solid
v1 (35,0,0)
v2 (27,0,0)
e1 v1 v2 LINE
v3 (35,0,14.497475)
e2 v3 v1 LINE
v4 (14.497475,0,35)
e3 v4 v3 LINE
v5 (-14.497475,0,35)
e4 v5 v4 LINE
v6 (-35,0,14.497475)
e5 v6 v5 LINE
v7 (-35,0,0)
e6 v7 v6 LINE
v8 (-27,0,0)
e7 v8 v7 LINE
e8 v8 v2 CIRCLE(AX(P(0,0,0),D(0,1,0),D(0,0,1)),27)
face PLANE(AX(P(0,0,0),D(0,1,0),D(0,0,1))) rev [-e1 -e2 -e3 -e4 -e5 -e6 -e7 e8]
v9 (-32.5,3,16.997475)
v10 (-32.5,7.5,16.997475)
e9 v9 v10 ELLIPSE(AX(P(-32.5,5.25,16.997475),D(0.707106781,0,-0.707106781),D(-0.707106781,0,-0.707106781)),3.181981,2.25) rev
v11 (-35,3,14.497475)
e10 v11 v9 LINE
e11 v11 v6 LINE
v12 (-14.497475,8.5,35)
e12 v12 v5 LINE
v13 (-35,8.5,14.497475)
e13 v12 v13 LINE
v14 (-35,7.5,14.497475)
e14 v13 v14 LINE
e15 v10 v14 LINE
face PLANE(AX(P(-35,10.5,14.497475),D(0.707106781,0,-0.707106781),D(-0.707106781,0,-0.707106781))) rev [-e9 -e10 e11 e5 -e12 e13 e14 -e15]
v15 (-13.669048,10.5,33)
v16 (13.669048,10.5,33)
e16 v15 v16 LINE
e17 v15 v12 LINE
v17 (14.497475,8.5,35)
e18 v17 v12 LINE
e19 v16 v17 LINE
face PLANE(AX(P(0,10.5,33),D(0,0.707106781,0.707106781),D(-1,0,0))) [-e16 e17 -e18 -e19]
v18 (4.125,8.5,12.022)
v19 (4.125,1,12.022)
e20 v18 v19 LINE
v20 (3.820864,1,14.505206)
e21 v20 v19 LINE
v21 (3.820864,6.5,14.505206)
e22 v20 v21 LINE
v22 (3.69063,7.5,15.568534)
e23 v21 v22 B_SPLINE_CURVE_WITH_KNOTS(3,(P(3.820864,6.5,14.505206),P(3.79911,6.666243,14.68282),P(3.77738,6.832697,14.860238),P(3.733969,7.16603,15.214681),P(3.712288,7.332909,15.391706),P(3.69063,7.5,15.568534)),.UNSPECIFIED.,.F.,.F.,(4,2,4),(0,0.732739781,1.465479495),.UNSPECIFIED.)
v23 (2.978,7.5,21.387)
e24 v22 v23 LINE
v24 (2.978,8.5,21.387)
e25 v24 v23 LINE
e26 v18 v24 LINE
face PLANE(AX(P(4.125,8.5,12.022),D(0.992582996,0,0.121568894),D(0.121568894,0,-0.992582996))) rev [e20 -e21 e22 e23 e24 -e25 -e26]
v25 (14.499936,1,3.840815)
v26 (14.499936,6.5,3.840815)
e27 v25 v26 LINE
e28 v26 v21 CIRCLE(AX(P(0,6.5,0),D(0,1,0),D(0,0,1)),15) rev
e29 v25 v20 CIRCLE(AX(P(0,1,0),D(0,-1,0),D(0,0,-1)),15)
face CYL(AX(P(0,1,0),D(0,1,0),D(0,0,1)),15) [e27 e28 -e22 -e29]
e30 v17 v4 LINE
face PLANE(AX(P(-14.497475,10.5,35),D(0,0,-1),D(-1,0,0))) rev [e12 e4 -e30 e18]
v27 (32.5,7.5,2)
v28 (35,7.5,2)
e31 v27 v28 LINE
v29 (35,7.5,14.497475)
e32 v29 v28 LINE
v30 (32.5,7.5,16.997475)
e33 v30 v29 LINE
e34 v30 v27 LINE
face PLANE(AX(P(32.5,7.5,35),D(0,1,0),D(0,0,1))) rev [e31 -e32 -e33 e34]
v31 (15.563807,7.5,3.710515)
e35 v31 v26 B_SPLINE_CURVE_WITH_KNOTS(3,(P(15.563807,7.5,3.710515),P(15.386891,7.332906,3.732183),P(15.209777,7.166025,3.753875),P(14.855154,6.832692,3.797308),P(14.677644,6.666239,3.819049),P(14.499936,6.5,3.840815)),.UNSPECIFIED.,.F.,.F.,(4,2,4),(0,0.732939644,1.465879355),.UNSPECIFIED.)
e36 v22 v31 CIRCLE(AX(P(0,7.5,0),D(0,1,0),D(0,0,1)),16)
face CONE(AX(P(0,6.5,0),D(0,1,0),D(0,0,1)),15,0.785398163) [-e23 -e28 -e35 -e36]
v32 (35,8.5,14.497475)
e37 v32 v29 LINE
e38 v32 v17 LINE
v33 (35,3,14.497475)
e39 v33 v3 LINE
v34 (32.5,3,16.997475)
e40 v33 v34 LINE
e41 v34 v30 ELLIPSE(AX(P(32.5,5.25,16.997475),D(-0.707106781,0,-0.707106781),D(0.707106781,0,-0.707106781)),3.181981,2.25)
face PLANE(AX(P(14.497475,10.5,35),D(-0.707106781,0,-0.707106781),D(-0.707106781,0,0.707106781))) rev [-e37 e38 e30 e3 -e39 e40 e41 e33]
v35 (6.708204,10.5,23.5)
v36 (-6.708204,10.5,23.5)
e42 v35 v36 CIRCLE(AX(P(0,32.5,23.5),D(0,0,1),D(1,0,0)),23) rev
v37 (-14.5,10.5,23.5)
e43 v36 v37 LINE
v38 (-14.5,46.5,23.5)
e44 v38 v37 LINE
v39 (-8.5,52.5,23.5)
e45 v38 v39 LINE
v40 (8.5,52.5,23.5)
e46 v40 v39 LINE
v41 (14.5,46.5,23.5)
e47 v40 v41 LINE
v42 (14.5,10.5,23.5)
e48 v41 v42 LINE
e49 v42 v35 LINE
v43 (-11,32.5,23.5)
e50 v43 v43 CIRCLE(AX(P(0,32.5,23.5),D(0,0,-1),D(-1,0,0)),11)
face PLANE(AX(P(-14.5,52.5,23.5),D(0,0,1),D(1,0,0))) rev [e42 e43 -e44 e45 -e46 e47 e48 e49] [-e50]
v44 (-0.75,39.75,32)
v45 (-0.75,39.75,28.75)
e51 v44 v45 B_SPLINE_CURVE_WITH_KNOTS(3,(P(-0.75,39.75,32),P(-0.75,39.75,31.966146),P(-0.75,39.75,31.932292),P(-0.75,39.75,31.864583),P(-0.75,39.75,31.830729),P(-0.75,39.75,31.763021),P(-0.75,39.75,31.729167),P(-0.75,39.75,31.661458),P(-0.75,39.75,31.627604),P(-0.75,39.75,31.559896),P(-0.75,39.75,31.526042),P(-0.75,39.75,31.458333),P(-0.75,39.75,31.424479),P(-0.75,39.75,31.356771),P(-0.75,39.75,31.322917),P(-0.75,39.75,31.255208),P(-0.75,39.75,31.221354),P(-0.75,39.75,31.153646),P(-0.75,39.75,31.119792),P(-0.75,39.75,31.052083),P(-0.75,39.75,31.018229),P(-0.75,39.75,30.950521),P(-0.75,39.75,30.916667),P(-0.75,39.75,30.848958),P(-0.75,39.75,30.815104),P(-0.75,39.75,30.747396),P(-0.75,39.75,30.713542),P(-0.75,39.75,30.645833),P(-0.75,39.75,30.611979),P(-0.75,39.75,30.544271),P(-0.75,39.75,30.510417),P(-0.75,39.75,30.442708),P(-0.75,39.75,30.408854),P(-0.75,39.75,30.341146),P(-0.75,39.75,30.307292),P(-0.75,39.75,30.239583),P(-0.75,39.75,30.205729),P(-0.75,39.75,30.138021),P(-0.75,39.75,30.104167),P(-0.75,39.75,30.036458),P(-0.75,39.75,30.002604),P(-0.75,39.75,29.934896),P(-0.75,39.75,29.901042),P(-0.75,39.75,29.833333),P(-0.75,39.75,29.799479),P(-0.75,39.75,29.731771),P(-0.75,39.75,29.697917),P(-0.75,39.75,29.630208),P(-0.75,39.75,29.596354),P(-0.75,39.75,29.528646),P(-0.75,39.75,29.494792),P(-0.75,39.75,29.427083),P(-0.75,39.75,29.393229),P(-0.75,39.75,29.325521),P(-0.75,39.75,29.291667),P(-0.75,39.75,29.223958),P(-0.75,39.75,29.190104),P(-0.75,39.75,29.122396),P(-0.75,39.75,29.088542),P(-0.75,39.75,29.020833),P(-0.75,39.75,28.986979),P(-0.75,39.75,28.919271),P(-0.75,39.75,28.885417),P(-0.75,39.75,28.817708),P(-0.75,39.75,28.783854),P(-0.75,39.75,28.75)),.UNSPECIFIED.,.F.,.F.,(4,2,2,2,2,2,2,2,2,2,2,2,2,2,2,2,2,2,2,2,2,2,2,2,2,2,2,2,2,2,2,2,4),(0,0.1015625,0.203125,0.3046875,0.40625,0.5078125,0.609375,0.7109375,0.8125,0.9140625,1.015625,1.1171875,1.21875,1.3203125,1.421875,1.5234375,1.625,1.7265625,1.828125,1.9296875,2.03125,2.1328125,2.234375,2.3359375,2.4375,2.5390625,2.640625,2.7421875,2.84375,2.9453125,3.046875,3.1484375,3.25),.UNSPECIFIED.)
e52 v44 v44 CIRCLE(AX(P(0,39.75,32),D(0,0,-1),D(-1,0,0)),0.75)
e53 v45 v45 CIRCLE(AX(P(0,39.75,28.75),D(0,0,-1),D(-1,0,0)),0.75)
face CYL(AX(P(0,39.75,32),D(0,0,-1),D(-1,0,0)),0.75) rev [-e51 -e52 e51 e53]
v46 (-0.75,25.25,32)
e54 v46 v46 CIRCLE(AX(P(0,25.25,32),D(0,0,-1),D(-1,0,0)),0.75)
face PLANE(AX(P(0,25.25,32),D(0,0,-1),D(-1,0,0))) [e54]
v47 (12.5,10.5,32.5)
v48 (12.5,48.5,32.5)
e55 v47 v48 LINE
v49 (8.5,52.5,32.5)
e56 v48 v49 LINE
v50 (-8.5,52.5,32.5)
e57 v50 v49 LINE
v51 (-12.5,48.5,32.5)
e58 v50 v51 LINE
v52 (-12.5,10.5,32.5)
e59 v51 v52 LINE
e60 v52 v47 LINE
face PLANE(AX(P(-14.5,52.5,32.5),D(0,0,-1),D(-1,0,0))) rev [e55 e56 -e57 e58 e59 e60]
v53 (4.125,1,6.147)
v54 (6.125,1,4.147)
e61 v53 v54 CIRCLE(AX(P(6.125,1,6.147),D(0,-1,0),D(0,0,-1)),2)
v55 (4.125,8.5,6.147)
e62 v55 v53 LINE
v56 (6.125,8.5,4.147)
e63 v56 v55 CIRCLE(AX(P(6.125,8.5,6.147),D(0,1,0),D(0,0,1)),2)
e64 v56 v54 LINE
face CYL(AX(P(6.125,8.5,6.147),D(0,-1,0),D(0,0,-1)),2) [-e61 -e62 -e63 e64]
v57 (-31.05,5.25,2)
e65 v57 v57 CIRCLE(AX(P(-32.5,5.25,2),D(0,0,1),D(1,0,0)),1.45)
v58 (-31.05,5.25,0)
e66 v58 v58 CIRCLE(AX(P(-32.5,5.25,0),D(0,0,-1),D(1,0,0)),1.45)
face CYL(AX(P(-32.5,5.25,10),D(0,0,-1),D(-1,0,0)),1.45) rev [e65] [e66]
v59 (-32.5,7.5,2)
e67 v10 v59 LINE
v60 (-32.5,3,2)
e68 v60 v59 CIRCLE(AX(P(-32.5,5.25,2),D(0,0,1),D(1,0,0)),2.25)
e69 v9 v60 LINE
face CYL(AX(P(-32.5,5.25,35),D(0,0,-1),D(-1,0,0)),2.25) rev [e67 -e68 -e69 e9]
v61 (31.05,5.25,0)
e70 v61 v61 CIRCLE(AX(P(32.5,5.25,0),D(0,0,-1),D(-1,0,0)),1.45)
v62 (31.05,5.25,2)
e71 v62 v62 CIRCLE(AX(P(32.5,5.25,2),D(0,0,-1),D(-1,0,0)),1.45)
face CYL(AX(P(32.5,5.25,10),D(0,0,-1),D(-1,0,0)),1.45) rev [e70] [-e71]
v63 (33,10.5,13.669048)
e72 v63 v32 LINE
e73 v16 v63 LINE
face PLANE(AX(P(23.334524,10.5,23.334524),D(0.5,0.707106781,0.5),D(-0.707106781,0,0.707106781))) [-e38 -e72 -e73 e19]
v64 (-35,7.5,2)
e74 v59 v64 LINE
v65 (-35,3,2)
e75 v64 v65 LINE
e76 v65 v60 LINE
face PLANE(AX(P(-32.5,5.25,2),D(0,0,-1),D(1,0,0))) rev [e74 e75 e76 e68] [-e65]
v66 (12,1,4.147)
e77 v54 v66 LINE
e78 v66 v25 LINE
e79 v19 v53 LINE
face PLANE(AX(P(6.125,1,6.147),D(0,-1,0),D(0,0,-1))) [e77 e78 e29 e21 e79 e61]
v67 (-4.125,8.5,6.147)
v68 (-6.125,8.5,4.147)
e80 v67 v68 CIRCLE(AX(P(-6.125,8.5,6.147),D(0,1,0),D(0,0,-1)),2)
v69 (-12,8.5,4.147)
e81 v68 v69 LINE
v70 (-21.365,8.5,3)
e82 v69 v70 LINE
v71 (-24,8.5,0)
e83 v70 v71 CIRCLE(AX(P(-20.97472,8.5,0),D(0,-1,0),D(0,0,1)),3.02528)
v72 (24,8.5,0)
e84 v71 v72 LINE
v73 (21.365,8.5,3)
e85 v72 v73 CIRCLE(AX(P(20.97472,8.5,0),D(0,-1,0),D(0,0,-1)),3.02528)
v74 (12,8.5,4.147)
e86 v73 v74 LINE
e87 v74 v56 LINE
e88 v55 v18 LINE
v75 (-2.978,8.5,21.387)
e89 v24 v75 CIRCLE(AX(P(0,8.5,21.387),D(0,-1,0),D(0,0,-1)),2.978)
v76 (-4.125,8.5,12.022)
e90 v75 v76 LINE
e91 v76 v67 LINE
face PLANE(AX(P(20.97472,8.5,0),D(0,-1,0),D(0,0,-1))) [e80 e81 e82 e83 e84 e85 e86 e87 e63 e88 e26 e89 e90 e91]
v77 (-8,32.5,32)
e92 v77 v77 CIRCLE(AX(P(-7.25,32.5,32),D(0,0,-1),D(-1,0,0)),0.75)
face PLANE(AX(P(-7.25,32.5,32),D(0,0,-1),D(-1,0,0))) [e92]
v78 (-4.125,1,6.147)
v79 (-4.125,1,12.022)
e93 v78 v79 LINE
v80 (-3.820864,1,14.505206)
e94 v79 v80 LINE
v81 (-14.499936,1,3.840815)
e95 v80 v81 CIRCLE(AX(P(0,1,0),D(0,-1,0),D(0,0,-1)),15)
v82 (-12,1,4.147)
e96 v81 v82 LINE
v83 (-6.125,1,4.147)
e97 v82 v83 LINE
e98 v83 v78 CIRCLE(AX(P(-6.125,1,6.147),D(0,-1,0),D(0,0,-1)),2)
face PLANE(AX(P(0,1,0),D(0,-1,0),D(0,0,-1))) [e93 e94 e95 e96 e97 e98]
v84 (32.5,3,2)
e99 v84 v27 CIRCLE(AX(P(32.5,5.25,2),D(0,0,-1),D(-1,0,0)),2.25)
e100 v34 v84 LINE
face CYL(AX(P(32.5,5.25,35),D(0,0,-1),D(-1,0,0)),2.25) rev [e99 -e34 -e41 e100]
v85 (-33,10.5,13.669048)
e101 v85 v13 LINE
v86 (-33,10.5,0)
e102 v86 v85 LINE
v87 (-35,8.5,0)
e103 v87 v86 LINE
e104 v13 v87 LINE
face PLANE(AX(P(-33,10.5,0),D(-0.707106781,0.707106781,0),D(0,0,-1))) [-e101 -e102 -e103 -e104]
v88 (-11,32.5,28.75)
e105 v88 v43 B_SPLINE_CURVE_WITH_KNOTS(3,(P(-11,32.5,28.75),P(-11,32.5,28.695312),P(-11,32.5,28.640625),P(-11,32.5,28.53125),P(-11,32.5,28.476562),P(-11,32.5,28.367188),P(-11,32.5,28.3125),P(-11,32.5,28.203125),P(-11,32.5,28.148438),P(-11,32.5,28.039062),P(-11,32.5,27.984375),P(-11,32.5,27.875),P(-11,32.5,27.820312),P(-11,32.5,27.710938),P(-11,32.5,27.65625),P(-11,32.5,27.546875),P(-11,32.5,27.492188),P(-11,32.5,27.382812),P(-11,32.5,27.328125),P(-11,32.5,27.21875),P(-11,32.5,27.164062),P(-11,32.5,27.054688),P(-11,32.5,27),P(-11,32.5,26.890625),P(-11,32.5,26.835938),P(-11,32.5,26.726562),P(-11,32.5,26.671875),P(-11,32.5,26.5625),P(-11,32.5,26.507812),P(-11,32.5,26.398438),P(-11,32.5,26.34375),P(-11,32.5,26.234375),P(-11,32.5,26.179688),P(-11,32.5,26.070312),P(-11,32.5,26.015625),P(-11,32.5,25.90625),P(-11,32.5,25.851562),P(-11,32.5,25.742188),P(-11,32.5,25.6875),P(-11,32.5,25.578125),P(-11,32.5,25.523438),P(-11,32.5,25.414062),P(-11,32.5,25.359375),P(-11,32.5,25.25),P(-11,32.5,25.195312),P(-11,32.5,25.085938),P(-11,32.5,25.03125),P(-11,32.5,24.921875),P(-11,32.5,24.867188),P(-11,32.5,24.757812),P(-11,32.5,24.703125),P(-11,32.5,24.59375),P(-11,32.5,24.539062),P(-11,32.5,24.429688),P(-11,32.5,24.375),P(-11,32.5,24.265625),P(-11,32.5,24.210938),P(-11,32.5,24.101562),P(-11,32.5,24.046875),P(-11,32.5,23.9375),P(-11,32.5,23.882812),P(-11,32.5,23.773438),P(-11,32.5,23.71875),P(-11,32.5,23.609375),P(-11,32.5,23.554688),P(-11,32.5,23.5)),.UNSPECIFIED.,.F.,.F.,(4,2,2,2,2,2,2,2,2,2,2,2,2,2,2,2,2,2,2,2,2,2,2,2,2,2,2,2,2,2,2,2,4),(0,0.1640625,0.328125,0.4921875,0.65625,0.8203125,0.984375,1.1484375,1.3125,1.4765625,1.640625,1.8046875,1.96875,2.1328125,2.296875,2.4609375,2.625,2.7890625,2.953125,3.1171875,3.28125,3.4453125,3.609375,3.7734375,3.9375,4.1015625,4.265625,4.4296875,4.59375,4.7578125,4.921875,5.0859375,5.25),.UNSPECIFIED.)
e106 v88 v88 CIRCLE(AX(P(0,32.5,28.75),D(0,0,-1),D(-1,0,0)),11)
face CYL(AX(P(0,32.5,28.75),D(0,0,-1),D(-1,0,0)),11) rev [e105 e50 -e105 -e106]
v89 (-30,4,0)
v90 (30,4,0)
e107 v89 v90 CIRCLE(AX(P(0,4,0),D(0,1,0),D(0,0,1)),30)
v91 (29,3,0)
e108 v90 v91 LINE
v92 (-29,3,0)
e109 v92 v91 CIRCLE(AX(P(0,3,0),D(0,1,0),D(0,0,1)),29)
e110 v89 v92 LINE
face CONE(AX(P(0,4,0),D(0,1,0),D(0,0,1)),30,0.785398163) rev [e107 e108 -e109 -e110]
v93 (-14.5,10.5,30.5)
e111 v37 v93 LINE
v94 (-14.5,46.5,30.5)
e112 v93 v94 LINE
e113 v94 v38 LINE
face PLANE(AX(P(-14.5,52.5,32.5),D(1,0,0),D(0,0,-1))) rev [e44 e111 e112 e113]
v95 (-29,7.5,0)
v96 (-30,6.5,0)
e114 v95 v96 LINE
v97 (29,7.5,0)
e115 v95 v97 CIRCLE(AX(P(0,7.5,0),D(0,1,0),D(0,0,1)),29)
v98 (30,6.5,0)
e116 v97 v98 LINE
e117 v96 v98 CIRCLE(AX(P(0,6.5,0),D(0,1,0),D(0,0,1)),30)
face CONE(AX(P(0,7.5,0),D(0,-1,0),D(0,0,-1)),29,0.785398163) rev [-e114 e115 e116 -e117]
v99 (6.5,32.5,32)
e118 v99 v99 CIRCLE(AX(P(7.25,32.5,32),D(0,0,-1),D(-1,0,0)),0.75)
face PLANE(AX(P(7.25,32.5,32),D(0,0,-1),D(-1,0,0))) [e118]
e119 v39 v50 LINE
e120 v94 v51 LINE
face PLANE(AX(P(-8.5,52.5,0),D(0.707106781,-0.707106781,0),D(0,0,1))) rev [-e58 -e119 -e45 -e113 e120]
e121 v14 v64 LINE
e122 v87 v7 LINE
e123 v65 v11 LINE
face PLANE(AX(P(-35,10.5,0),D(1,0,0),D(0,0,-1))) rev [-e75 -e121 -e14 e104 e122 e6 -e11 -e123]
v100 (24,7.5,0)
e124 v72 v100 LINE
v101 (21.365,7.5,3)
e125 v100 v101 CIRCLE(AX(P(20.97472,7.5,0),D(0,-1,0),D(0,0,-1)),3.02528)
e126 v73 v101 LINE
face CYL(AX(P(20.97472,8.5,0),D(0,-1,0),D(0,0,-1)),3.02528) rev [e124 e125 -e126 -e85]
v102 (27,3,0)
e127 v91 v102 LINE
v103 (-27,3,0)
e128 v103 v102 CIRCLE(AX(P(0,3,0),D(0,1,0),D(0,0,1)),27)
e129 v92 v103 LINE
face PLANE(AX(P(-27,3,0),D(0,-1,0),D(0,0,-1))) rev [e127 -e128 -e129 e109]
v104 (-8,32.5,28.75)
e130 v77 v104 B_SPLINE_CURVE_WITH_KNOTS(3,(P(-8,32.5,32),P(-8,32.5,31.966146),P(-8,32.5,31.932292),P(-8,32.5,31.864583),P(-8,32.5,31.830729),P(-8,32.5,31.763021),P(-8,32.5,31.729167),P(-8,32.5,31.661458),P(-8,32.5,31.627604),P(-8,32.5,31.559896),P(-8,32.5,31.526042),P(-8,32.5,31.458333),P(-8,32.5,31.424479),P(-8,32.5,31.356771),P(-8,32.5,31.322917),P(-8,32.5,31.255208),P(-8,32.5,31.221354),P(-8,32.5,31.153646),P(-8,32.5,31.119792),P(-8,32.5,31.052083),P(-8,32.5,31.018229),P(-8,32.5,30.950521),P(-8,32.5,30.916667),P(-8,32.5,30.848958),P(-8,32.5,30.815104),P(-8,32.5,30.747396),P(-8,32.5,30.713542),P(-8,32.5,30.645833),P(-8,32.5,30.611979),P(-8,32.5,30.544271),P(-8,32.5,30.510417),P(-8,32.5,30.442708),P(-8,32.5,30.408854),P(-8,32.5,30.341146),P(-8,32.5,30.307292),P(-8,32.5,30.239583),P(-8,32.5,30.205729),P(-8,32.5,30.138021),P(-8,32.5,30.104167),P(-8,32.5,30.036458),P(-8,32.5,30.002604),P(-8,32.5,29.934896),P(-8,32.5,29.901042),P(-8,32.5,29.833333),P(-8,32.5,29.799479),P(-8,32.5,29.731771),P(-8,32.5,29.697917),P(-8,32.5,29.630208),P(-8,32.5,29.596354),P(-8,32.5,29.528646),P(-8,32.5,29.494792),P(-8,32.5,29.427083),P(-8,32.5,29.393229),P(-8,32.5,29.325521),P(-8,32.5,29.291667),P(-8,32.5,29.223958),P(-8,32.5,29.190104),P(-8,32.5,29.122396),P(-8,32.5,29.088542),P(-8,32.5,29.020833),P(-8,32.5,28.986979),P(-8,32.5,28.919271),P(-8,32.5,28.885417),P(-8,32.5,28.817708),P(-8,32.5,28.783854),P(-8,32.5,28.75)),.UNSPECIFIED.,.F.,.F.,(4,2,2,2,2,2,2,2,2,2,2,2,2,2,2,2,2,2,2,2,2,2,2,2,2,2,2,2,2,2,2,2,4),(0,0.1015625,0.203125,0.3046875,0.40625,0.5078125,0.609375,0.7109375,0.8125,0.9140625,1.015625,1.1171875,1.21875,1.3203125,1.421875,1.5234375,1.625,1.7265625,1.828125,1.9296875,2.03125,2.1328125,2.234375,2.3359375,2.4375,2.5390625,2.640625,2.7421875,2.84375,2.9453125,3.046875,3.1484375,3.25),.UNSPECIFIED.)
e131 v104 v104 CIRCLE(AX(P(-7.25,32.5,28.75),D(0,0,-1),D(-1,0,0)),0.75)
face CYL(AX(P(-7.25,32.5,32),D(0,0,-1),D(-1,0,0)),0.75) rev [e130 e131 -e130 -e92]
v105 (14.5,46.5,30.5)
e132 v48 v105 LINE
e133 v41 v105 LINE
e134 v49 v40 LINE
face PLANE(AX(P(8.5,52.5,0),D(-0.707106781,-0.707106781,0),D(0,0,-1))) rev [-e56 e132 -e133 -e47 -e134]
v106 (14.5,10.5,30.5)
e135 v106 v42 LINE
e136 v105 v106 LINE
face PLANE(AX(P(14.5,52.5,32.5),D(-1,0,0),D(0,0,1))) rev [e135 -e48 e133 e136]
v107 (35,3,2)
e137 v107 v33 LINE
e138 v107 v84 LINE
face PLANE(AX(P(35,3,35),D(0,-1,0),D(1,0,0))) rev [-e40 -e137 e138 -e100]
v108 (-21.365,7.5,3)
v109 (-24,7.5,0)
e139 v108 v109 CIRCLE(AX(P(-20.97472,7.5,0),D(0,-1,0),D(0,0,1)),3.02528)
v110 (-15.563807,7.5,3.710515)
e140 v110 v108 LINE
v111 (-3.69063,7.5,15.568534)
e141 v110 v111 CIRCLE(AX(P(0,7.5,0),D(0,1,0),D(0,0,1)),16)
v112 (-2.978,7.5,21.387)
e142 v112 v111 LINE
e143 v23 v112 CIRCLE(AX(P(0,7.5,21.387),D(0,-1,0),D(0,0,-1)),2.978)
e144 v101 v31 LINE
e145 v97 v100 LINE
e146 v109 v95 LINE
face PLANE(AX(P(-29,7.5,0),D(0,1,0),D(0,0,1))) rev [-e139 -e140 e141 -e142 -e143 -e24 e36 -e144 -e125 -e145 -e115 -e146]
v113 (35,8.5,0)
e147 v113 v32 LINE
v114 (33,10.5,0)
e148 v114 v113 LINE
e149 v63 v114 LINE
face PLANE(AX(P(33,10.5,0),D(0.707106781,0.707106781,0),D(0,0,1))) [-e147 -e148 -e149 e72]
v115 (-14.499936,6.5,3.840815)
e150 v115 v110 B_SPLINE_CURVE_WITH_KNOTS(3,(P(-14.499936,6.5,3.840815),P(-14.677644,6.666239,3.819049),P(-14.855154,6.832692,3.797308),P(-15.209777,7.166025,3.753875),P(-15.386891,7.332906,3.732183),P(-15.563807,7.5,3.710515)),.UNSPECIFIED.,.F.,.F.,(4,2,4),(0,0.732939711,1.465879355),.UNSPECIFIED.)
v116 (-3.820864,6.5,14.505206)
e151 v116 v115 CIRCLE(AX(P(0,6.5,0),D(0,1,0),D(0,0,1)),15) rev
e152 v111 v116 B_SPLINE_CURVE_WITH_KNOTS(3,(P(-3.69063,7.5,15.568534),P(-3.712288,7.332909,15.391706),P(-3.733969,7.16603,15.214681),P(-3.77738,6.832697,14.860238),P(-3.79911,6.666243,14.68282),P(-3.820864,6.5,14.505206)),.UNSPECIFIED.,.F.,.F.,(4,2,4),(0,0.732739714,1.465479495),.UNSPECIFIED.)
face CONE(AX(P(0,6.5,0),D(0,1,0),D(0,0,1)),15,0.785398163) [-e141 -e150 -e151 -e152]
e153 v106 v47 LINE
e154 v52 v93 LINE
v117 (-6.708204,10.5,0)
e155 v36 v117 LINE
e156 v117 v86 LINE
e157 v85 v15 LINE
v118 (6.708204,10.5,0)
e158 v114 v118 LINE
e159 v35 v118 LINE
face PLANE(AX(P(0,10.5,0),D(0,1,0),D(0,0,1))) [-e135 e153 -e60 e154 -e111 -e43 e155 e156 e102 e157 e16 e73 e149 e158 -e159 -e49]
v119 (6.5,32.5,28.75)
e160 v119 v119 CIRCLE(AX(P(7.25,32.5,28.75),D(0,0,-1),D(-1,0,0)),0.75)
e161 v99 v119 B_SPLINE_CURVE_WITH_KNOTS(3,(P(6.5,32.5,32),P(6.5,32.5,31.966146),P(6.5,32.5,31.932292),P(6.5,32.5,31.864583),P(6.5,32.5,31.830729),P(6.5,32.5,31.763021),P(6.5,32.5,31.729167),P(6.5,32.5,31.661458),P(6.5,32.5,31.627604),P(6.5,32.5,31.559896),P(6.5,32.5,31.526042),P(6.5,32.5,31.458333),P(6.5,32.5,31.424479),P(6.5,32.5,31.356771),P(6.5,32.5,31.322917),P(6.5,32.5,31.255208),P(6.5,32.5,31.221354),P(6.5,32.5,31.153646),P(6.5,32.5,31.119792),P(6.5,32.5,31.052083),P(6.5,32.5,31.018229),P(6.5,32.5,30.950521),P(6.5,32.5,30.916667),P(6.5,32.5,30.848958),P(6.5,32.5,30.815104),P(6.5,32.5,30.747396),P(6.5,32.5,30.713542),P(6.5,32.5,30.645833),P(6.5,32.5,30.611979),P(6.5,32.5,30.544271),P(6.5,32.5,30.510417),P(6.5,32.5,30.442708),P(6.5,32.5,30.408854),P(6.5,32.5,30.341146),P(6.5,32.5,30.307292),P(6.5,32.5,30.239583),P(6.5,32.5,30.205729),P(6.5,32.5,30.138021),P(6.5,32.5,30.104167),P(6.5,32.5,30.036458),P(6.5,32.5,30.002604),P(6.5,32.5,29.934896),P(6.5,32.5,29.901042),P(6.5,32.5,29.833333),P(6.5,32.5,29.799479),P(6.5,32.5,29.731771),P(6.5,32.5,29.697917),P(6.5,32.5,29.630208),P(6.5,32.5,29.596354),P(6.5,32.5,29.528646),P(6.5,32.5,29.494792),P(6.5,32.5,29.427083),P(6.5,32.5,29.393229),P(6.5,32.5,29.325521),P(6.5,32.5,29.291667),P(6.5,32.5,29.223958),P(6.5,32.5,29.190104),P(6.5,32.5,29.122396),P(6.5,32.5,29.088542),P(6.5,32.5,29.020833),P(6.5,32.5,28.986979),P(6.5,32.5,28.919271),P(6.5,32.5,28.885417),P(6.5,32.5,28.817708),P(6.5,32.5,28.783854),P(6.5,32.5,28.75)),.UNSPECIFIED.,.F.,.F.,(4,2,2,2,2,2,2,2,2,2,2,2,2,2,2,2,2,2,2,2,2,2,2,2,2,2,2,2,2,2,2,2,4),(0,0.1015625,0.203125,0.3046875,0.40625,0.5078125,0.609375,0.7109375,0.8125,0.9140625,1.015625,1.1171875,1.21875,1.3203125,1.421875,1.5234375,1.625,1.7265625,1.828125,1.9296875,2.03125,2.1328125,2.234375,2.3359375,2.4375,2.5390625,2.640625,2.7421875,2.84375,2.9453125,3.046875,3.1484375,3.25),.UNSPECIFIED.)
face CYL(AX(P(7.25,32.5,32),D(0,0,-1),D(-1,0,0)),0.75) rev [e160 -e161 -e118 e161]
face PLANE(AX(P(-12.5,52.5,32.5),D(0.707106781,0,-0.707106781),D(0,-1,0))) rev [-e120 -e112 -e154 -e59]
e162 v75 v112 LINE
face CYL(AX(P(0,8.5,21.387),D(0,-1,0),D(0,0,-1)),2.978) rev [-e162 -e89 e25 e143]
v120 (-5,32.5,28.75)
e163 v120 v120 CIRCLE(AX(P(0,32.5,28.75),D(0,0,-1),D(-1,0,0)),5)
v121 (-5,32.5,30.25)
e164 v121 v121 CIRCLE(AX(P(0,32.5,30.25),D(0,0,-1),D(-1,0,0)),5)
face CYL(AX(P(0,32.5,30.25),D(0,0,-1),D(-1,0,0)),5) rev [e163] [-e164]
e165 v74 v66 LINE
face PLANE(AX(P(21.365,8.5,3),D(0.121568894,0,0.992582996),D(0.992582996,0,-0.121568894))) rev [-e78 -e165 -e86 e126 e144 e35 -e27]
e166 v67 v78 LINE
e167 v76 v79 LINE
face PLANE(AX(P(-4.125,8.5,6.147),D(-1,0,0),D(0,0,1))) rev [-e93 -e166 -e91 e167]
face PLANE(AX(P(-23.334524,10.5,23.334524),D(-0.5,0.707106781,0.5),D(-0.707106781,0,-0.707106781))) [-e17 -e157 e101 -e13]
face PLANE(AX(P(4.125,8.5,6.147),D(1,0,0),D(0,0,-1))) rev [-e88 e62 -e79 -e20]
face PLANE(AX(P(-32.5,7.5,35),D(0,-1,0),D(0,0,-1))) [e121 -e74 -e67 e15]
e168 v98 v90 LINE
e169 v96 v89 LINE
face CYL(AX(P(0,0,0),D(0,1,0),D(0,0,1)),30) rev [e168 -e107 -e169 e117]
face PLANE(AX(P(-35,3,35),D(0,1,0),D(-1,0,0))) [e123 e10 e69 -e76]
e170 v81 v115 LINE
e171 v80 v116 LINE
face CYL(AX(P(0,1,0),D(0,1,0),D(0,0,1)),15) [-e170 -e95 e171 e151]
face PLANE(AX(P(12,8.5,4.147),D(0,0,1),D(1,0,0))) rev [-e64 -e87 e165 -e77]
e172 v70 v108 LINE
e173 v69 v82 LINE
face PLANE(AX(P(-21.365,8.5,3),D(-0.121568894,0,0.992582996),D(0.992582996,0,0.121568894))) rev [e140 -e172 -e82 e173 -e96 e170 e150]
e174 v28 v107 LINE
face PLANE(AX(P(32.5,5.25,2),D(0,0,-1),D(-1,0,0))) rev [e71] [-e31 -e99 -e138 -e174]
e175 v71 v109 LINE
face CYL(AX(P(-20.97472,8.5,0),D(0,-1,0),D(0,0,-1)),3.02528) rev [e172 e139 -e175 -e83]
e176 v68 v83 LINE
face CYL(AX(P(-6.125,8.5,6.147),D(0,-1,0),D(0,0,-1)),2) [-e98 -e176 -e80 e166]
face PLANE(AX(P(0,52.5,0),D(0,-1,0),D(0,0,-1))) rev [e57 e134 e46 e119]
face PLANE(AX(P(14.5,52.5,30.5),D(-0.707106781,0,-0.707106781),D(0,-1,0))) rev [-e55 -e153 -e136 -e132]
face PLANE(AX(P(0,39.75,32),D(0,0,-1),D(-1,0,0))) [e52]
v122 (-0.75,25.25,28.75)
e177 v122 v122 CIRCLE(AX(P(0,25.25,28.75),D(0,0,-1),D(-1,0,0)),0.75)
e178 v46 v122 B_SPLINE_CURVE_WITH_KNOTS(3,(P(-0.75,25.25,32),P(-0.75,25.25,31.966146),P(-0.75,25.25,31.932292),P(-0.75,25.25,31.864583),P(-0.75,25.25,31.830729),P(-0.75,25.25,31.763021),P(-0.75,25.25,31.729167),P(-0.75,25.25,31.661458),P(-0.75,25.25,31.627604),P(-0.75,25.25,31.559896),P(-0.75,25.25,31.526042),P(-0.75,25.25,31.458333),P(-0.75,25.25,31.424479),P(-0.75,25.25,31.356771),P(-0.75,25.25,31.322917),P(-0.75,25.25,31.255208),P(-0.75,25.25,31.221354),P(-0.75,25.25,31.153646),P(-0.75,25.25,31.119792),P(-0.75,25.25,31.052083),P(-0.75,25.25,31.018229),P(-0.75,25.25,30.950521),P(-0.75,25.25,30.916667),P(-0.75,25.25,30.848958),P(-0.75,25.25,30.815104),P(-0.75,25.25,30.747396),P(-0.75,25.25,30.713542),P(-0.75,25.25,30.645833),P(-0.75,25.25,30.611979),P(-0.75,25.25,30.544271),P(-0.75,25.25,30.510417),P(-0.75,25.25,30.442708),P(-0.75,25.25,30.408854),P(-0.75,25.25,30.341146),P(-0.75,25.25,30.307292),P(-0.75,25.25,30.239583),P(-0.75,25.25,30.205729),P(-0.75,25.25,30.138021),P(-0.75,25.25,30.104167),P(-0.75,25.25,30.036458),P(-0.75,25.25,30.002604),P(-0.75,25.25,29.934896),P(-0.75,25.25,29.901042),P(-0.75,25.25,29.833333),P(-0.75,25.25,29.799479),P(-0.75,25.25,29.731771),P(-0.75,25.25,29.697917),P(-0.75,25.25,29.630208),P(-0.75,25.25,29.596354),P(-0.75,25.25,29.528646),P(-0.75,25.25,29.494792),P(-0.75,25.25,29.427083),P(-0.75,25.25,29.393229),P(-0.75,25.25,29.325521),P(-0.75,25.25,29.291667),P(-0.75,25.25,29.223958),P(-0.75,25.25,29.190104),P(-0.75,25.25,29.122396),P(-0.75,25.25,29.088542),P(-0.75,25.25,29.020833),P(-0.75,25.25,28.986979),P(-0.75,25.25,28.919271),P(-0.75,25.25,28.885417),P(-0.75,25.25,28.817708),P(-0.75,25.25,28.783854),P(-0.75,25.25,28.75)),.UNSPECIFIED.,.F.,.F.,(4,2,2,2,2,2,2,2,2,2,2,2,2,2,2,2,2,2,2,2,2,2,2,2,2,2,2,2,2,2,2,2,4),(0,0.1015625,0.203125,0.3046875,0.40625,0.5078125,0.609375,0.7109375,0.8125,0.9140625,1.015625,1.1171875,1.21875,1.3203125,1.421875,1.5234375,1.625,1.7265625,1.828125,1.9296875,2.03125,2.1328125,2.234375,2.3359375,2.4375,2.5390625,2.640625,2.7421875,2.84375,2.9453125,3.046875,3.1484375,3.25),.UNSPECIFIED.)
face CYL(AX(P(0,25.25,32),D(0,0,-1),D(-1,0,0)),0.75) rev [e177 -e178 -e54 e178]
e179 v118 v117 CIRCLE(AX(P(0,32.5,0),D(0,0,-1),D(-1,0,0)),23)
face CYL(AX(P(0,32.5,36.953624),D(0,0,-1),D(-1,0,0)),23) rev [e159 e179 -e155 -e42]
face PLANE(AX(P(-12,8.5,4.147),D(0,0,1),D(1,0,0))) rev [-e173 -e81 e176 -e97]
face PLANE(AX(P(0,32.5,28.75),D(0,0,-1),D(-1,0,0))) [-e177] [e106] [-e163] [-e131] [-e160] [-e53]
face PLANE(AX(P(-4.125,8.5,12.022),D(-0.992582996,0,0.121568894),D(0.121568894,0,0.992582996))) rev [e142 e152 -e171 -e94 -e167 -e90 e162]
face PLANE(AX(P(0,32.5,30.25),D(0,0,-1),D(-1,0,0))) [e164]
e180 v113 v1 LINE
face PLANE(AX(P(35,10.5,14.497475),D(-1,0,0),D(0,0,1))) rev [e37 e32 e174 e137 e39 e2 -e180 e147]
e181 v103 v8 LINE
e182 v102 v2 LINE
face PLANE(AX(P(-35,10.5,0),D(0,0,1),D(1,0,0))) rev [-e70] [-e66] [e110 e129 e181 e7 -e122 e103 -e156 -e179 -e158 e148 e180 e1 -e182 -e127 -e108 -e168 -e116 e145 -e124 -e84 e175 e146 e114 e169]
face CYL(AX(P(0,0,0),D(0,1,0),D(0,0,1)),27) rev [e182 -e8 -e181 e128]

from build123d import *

# Parameters (mm, degrees)
BOSS_EXTRUDE1_DEPTH = 10.5
BOSS_EXTRUDE2_DEPTH = 42
CUT_REVOLVE1_ANGLE  = 180.0000000000004
CHAMFER1_SIZE       = 6
CHAMFER2_SIZE       = 2
CUT_EXTRUDE2_DEPTH  = 1
BOSS_EXTRUDE3_START = 6.5
BOSS_EXTRUDE3_DEPTH = 6.5
CHAMFER3_SIZE       = 1
SKETCH10_R          = 1.45
CUT_EXTRUDE6_DEPTH  = 10
SKETCH11_R          = 1.45
CUT_EXTRUDE7_DEPTH  = 72.20568797504873
MIRROR1_START       = 2
MIRROR1_DEPTH       = 17.247474683
SKETCH12_R          = 10.999999999999998
CUT_EXTRUDE8_DEPTH  = 5.25
SKETCH13_R          = 0.7500000000000007
SKETCH13_R_2        = 0.7499999999999987
SKETCH13_R_3        = 0.75
SKETCH13_R_4        = 0.7500000000000037
CUT_EXTRUDE9_DEPTH  = 3.25
SKETCH14_R          = 4.999999999999999
CUT_EXTRUDE10_DEPTH = 1.5
CUT_EXTRUDE11_DEPTH = 23.5


# Read off the part's stored shape, not the designer's step: Mirror1
with BuildPart() as part:
    # Sketch1 → Boss-Extrude1 (new body)
    with BuildSketch(Plane(origin=(0, 0, 0), x_dir=(1, 0, 0), z_dir=(0, 1, 0))):
        Polygon((-35, 0), (35, 0), (35, -14.497474683058336), (14.497474683058336, -35), (-14.497474683058336, -35), (-35, -14.497474683058334), align=None)
    extrude(amount=BOSS_EXTRUDE1_DEPTH)

    # Sketch2 → Boss-Extrude2 (add)
    with BuildSketch(Plane(origin=(0, 10.5, 0), x_dir=(1, 0, 0), z_dir=(0, 1, 0))):
        Polygon((-14.5, -32.5), (14.5, -32.49999999999999), (14.5, -23.499999999999993), (-14.5, -23.499999999999993), align=None)
    extrude(amount=BOSS_EXTRUDE2_DEPTH)

    # Sketch3 → Cut-Revolve1 (revolve, cut)
    with BuildSketch(Plane(origin=(0, 0, 0), x_dir=(-1, 0, 0), z_dir=(0, 0, -1))):
        Polygon((-27.000000000000004, 0), (-27.000000000000004, 3), (-29, 2.999999999999999), (-30.000000000000004, 4), (-30.000000000000004, 6.5), (-29, 7.500000000000001), (0, 7.5), (0, 0), align=None)
    revolve(axis=Axis((0, 0, 0), (0, -1, 0)), revolution_arc=CUT_REVOLVE1_ANGLE, mode=Mode.SUBTRACT)

    # Chamfer1
    chamfer1_edges = [part.edges().sort_by_distance(p)[0] for p in [
        (-14.5, 52.5, 27.999999999999996),
        (14.5, 52.5, 27.999999999999993),
    ]]
    chamfer(chamfer1_edges, length=CHAMFER1_SIZE)

    # Chamfer2
    # the kernel refuses this chamfer: 2 mm, written as the material it takes off along each edge
    with BuildSketch(Plane(origin=(38.63690895970556, 10.5, 10.860565723352778), x_dir=(-0.7068394360706735, 0.02749587661058652, -0.7068394360706735), z_dir=(-0.7071067811865476, 0, 0.7071067811865476)), Plane(origin=(-10.860565723352778, 10.5, 38.63690895970556), x_dir=(0.7068394360706735, 0.02749587661058652, -0.7068394360706735), z_dir=(-0.7071067811865476, 0, -0.7071067811865476))) as chamfer2_piece_1:
        Polygon((CHAMFER2_SIZE * 0.999621916911, CHAMFER2_SIZE * 0.0274958766106), (-CHAMFER2_SIZE * 0.0274958766106, CHAMFER2_SIZE * 0.999621916911), (0, 0), align=None)
    extrude(amount=39.28168131798029, mode=Mode.SUBTRACT)
    with BuildSketch(Plane(origin=(35, 10.5, -5.14336597593182), x_dir=(-0.9996219169112968, 0.02749587661058651, 0), z_dir=(0, 0, 1)), Plane(origin=(-35, 10.5, 19.640840658990157), x_dir=(0.9996219169112968, 0.02749587661058651, 0), z_dir=(0, 0, -1))) as chamfer2_piece_2:
        Polygon((CHAMFER2_SIZE * 0.999621916911, CHAMFER2_SIZE * 0.0274958766106), (-CHAMFER2_SIZE * 0.0274958766106, CHAMFER2_SIZE * 0.999621916911), (0, 0), align=None)
    extrude(amount=24.78420663492198, mode=Mode.SUBTRACT)
    with BuildSketch(Plane(origin=(14.5, 10.5, 32.49999999999999), x_dir=(-0.9996219169112968, 0, 0.027495876610585623), z_dir=(0, 1, 0))) as chamfer2_piece_3:
        Polygon((CHAMFER2_SIZE * 0.999621916911, -CHAMFER2_SIZE * 0.0274958766106), (-CHAMFER2_SIZE * 0.0274958766106, -CHAMFER2_SIZE * 0.999621916911), (0, 0), align=None)
    extrude(amount=41.14336597593182, mode=Mode.SUBTRACT)
    with BuildSketch(Plane(origin=(-14.5, 10.5, 32.5), x_dir=(-0.02749587661058651, 0, -0.9996219169112968), z_dir=(0, 1, 0))) as chamfer2_piece_4:
        Polygon((CHAMFER2_SIZE * 0.999621916911, -CHAMFER2_SIZE * 0.0274958766106), (-CHAMFER2_SIZE * 0.0274958766106, -CHAMFER2_SIZE * 0.999621916911), (0, 0), align=None)
    extrude(amount=41.14336597593182, mode=Mode.SUBTRACT)
    with BuildSketch(Plane(origin=(19.640840658990157, 10.5, 35), x_dir=(0, 0.02749587661058651, -0.9996219169112968), z_dir=(-1, 0, 0))) as chamfer2_piece_5:
        Polygon((CHAMFER2_SIZE * 0.999621916911, CHAMFER2_SIZE * 0.0274958766106), (-CHAMFER2_SIZE * 0.0274958766106, CHAMFER2_SIZE * 0.999621916911), (0, 0), align=None)
    extrude(amount=39.281681317980315, mode=Mode.SUBTRACT)

    # Sketch5 → Cut-Extrude2 (cut)
    with BuildSketch(Plane.XZ.offset(-7.5)):
        with BuildLine():
            Line((24, 8.82e-15), (-24, 0))
            ThreePointArc((-24, 0), (-23.247716404991003, 1.9964484090504302), (-21.365000000000002, 3))
            Line((-21.365000000000002, 3), (-12.000000000000002, 4.147))
            Line((-12.000000000000002, 4.147), (-6.125000000000002, 4.147000000000001))
            ThreePointArc((-6.125000000000002, 4.147000000000001), (-4.710786437626908, 4.732786437626906), (-4.125000000000002, 6.146999999999999))
            Line((-4.125000000000002, 6.146999999999999), (-4.125000000000002, 12.022))
            Line((-4.125000000000002, 12.022), (-2.9780000000000033, 21.387))
            ThreePointArc((-2.9780000000000033, 21.387), (1.8e-16, 24.365000000000002), (2.9780000000000033, 21.387))
            Line((2.9780000000000033, 21.387), (4.125000000000002, 12.022))
            Line((4.125000000000002, 12.022), (4.125000000000002, 6.146999999999999))
            ThreePointArc((4.125000000000002, 6.146999999999999), (4.710786437626908, 4.732786437626905), (6.125000000000002, 4.147000000000001))
            Line((6.125000000000002, 4.147000000000001), (12.000000000000002, 4.147))
            Line((12.000000000000002, 4.147), (21.365000000000002, 3))
            ThreePointArc((21.365000000000002, 3), (23.247716404991003, 1.996448409050434), (24, 8.82e-15))
        make_face()
    extrude(amount=-CUT_EXTRUDE2_DEPTH, mode=Mode.SUBTRACT)

    # Sketch6 → Boss-Extrude3 (add)
    with BuildSketch(Plane.XZ.offset(-7.5).offset(BOSS_EXTRUDE3_START)):
        with BuildLine():
            Line((14.499935981026823, 3.8408145680472217), (12.000000000000002, 4.147))
            Line((12.000000000000002, 4.147), (6.125000000000002, 4.147))
            ThreePointArc((6.125000000000002, 4.147), (4.710786437626906, 4.732786437626904), (4.125000000000002, 6.146999999999999))
            Line((4.125000000000002, 6.146999999999999), (4.125000000000002, 12.022))
            Line((4.125000000000002, 12.022), (3.8208636103945306, 14.505206005802291))
            ThreePointArc((3.8208636103945306, 14.505206005802291), (10.599303543236797, 10.613894874094425), (14.499935981026823, 3.8408145680472217))
        make_face()
        with BuildLine():
            Line((-3.8208636103945306, 14.505206005802291), (-4.125000000000002, 12.022))
            Line((-4.125000000000002, 12.022), (-4.125000000000003, 6.146999999999999))
            ThreePointArc((-4.125000000000003, 6.146999999999999), (-4.710786437626908, 4.732786437626906), (-6.125000000000002, 4.147000000000001))
            Line((-6.125000000000002, 4.147000000000001), (-12.000000000000002, 4.147))
            Line((-12.000000000000002, 4.147), (-14.499935981026823, 3.8408145680472217))
            ThreePointArc((-14.499935981026823, 3.8408145680472217), (-10.599303543236797, 10.613894874094424), (-3.8208636103945306, 14.505206005802291))
        make_face()
    extrude(amount=-BOSS_EXTRUDE3_DEPTH)

    # Chamfer3
    chamfer3_edges = [part.edges().sort_by_distance(p)[0] for p in [
        (10.5993035432368, 7.5, 10.613894874094427),
        (-10.599303543236797, 7.5, 10.613894874094424),
    ]]
    chamfer(chamfer3_edges, length=CHAMFER3_SIZE)

    # Sketch10 → Cut-Extrude6 (cut)
    with BuildSketch(Plane(origin=(0, 0, 0), x_dir=(-1, 0, 0), z_dir=(0, 0, -1))):
        with Locations((-32.5, 5.249999999999999)):
            Circle(SKETCH10_R)
        with Locations(Location((32.5, 5.249999999999999, 0), (0, 0, 180))):
            Circle(SKETCH10_R)
    extrude(amount=-CUT_EXTRUDE6_DEPTH, mode=Mode.SUBTRACT)

    # Sketch11 → Cut-Extrude7 (cut, through all)
    with BuildSketch(Plane(origin=(0, 0, 2), x_dir=(-1, 0, 0), z_dir=(0, 0, -1))):
        with BuildLine():
            Line((-32.5, 7.499999999999998), (-35, 7.499999999999998))
            Line((-35, 7.499999999999998), (-35, 3.000000000000001))
            Line((-35, 3.000000000000001), (-32.5, 3.0000000000000004))
            ThreePointArc((-32.5, 3.0000000000000004), (-30.25, 5.249999999999999), (-32.5, 7.499999999999998))
        make_face()
        with Locations((-32.5, 5.249999999999999)):
            Circle(SKETCH11_R, mode=Mode.SUBTRACT)
    extrude(amount=-CUT_EXTRUDE7_DEPTH, mode=Mode.SUBTRACT)


with BuildPart() as cut_extrude7_kept_piece:
    # of the separate pieces the step leaves, the one the design keeps (cut_extrude7_pieces_kept)
    add(part.part.solids().sort_by_distance((15.563806793, 7.5, 3.710514534))[0])

    # Mirror1 outline → Mirror1 (cut)
    with BuildSketch(Plane.XY.offset(MIRROR1_START)):
        with BuildLine():
            Line((-32.5, 7.5), (-35, 7.5))
            Line((-35, 7.5), (-35, 3))
            Line((-35, 3), (-32.5, 3))
            ThreePointArc((-32.5, 3), (-30.25, 5.25), (-32.5, 7.5))
        make_face()
    extrude(amount=MIRROR1_DEPTH, mode=Mode.SUBTRACT)

    # Sketch12 → Cut-Extrude8 (cut)
    with BuildSketch(Plane(origin=(0, 0, 23.499999999999993), x_dir=(-1, 0, 0), z_dir=(0, 0, -1))):
        with Locations((0, 32.5)):
            Circle(SKETCH12_R)
    extrude(amount=-CUT_EXTRUDE8_DEPTH, mode=Mode.SUBTRACT)

    # Sketch13 → Cut-Extrude9 (cut)
    with BuildSketch(Plane(origin=(0, 0, 28.749999999999993), x_dir=(-1, 0, 0), z_dir=(0, 0, -1))):
        with Locations((0, 25.25)):
            Circle(SKETCH13_R)
        with Locations((-7.249999999999999, 32.49999999999999)):
            Circle(SKETCH13_R_2)
        with Locations((-8.9e-16, 39.75)):
            Circle(SKETCH13_R_3)
        with Locations((7.249999999999999, 32.50000000000001)):
            Circle(SKETCH13_R_4)
    extrude(amount=-CUT_EXTRUDE9_DEPTH, mode=Mode.SUBTRACT)

    # Sketch14 → Cut-Extrude10 (cut)
    with BuildSketch(Plane(origin=(0, 0, 28.749999999999993), x_dir=(-1, 0, 0), z_dir=(0, 0, -1))):
        with Locations((0, 32.5)):
            Circle(SKETCH14_R)
    extrude(amount=-CUT_EXTRUDE10_DEPTH, mode=Mode.SUBTRACT)

    # Sketch16 → Cut-Extrude11 (cut)
    with BuildSketch(Plane(origin=(0, 0, 0), x_dir=(-1, 0, 0), z_dir=(0, 0, -1))):
        with BuildLine():
            Line((-6.708203932499372, 10.500000000000002), (6.708203932499372, 10.500000000000002))
            ThreePointArc((6.708203932499372, 10.500000000000002), (1.41e-15, 9.5), (-6.708203932499372, 10.500000000000002))
        make_face()
    extrude(amount=-CUT_EXTRUDE11_DEPTH, mode=Mode.SUBTRACT)


solid = cut_extrude7_kept_piece.part
